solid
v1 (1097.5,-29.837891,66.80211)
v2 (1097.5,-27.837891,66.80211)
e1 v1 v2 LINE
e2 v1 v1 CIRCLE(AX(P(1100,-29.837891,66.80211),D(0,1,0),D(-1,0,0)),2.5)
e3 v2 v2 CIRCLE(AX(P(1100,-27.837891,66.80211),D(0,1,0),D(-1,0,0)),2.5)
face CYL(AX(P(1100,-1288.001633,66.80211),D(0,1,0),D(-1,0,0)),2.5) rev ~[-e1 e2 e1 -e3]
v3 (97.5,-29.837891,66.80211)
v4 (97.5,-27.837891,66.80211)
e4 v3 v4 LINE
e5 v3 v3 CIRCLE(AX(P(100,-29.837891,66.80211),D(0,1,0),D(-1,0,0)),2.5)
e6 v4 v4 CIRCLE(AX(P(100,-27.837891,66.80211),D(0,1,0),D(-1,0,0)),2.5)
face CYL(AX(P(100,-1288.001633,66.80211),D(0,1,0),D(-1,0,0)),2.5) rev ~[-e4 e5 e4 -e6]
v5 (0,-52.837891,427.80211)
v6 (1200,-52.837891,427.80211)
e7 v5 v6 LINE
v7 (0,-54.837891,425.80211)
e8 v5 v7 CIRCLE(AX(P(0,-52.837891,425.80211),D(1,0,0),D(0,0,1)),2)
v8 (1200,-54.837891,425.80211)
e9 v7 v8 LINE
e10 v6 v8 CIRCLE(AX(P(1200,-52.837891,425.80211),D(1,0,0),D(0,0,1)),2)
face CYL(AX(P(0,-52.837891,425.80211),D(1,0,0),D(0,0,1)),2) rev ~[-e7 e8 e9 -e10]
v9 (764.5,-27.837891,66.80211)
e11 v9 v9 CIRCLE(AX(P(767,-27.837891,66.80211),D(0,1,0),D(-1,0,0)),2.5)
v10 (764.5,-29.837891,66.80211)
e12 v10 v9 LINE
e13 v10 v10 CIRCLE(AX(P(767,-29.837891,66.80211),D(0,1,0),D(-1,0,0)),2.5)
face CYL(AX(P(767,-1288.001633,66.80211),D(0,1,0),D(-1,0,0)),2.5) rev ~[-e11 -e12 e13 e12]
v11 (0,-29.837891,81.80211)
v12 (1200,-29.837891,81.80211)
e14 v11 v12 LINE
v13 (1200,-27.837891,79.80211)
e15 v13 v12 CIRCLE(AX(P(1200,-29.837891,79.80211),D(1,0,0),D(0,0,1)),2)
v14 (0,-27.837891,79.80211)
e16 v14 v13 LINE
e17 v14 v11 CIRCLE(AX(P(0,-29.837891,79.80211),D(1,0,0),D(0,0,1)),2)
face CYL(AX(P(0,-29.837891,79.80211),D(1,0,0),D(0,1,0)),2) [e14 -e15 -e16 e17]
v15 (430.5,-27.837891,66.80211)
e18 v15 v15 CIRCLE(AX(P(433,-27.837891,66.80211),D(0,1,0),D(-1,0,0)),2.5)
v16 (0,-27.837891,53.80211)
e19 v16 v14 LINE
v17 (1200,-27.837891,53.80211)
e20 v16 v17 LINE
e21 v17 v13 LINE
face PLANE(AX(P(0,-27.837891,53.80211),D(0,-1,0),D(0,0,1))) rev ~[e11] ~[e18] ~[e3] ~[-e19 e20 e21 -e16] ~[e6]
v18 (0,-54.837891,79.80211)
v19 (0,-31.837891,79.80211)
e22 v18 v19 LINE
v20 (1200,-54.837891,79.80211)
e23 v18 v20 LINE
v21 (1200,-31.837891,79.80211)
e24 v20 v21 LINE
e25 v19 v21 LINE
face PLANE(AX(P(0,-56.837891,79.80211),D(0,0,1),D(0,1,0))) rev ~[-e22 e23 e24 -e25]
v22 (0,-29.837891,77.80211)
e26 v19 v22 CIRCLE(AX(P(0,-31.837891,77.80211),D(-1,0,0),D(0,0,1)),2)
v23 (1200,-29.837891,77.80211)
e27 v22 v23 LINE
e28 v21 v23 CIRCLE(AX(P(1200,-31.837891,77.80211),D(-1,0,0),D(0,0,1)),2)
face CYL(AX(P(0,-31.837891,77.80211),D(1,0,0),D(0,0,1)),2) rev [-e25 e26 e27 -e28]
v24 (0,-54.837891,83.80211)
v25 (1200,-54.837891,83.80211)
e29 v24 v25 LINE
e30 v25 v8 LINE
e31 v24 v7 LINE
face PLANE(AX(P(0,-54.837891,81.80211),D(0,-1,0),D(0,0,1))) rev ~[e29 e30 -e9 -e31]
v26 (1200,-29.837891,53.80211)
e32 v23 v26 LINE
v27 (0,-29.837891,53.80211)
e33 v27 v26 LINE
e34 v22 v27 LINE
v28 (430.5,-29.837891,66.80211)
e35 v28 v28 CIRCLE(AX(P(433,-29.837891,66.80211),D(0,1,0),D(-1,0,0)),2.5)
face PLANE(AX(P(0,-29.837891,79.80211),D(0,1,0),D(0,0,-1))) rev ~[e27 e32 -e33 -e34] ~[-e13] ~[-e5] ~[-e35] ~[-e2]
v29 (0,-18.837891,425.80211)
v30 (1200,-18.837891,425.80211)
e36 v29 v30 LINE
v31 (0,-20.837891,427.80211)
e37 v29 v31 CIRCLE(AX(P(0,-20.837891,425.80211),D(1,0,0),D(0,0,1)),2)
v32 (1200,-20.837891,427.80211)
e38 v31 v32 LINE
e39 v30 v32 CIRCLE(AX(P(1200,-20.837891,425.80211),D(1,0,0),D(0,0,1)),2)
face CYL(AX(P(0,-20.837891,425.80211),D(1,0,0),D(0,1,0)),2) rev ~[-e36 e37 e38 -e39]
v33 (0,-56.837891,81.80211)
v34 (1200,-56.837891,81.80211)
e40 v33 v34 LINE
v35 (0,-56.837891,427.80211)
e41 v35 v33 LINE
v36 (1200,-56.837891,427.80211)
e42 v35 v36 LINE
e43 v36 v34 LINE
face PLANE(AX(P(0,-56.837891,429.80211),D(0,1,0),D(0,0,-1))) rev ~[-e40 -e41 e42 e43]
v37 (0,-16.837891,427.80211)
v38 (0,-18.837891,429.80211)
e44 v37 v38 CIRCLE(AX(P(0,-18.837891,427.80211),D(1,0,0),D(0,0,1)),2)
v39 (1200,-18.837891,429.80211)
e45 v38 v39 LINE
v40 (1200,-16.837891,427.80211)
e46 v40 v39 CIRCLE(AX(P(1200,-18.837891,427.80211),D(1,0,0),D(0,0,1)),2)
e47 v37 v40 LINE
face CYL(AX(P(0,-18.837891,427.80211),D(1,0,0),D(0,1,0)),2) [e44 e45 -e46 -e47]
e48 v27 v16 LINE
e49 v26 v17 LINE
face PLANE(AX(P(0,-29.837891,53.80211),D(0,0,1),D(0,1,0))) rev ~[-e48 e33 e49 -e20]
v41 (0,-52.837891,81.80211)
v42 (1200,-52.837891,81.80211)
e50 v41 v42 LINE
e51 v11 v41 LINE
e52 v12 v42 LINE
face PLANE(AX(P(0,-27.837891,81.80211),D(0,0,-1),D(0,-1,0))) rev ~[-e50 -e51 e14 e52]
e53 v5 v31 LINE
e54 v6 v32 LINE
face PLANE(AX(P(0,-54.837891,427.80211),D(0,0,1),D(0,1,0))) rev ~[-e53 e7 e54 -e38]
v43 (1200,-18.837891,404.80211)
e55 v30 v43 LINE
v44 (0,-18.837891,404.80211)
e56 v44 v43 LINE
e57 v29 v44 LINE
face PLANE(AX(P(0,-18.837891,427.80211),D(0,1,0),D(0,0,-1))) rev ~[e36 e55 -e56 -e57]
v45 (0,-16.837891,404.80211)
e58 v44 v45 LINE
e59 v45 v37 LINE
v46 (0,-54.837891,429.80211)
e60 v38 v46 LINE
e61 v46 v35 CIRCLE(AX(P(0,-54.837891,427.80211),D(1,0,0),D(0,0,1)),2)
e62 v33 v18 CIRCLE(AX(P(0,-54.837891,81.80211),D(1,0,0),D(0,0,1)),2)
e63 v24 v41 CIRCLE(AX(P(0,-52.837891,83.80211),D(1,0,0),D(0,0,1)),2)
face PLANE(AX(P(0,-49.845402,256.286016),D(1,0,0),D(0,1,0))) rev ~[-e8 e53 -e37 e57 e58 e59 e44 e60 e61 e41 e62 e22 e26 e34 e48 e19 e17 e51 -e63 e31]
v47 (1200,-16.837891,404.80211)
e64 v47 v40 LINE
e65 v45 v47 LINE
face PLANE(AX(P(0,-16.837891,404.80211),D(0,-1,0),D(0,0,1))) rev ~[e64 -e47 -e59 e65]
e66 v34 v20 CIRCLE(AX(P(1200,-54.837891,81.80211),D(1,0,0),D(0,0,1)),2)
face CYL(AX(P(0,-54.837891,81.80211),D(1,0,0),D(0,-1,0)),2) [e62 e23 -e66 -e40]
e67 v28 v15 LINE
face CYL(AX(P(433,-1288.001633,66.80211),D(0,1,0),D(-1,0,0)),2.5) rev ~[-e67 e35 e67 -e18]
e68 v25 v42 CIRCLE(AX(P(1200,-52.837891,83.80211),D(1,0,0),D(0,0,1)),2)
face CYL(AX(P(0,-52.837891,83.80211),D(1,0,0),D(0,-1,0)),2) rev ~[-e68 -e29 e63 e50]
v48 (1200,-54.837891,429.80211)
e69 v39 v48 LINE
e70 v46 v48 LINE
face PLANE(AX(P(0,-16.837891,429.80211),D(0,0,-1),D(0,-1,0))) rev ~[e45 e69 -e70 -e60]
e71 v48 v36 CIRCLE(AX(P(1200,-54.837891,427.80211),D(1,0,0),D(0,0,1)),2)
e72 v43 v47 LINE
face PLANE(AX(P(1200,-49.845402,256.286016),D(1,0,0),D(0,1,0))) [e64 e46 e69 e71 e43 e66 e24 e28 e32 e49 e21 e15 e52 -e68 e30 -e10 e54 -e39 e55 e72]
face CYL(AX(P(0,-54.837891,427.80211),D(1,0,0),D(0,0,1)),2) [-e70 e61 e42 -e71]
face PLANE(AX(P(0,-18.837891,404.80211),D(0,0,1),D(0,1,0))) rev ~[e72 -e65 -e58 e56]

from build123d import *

# Parameters (mm, degrees)
F1_DEPTH = 1200
F3_D     = 5
F4_R     = 2


# Not quite as in the source:
# - a feature names something its author has since deleted; it is built from what else it names


with BuildPart() as f1:
    # F0 (on Right) → F1 (new body)
    with BuildSketch(Plane.YZ):
        Polygon((-18.8378913403, 427.8021101952), (-18.8378913403, 404.8021101952), (-16.8378913403, 404.8021101952), (-16.8378913403, 429.8021101952), (-56.8378913403, 429.8021101952), (-56.8378913403, 79.8021101952), (-29.8378913403, 79.8021101952), (-29.8378913403, 53.8021101952), (-27.8378913403, 53.8021101952), (-27.8378913403, 81.8021101952), (-54.8378913403, 81.8021101952), (-54.8378913403, 427.8021101952), align=None)
    extrude(amount=F1_DEPTH)

    # F3 (through all)
    with Locations(Plane.XZ.offset(29.8378913403)):
        with Locations((433, 66.8021101952), (767, 66.8021101952), (1100, 66.8021101952), (100, 66.8021101952)):
            Hole(F3_D / 2)

    # F4
    f4_edges = [f1.edges().sort_by_distance(p)[0] for p in [
        (600, -56.837891, 429.80211),
        (600, -16.837891, 429.80211),
        (600, -56.837891, 79.80211),
        (600, -27.837891, 81.80211),
        (600, -54.837891, 81.80211),
        (600, -29.837891, 79.80211),
        (600, -18.837891, 427.80211),
        (600, -54.837891, 427.80211),
    ]]
    fillet(f4_edges, radius=F4_R)


solid = f1.part
